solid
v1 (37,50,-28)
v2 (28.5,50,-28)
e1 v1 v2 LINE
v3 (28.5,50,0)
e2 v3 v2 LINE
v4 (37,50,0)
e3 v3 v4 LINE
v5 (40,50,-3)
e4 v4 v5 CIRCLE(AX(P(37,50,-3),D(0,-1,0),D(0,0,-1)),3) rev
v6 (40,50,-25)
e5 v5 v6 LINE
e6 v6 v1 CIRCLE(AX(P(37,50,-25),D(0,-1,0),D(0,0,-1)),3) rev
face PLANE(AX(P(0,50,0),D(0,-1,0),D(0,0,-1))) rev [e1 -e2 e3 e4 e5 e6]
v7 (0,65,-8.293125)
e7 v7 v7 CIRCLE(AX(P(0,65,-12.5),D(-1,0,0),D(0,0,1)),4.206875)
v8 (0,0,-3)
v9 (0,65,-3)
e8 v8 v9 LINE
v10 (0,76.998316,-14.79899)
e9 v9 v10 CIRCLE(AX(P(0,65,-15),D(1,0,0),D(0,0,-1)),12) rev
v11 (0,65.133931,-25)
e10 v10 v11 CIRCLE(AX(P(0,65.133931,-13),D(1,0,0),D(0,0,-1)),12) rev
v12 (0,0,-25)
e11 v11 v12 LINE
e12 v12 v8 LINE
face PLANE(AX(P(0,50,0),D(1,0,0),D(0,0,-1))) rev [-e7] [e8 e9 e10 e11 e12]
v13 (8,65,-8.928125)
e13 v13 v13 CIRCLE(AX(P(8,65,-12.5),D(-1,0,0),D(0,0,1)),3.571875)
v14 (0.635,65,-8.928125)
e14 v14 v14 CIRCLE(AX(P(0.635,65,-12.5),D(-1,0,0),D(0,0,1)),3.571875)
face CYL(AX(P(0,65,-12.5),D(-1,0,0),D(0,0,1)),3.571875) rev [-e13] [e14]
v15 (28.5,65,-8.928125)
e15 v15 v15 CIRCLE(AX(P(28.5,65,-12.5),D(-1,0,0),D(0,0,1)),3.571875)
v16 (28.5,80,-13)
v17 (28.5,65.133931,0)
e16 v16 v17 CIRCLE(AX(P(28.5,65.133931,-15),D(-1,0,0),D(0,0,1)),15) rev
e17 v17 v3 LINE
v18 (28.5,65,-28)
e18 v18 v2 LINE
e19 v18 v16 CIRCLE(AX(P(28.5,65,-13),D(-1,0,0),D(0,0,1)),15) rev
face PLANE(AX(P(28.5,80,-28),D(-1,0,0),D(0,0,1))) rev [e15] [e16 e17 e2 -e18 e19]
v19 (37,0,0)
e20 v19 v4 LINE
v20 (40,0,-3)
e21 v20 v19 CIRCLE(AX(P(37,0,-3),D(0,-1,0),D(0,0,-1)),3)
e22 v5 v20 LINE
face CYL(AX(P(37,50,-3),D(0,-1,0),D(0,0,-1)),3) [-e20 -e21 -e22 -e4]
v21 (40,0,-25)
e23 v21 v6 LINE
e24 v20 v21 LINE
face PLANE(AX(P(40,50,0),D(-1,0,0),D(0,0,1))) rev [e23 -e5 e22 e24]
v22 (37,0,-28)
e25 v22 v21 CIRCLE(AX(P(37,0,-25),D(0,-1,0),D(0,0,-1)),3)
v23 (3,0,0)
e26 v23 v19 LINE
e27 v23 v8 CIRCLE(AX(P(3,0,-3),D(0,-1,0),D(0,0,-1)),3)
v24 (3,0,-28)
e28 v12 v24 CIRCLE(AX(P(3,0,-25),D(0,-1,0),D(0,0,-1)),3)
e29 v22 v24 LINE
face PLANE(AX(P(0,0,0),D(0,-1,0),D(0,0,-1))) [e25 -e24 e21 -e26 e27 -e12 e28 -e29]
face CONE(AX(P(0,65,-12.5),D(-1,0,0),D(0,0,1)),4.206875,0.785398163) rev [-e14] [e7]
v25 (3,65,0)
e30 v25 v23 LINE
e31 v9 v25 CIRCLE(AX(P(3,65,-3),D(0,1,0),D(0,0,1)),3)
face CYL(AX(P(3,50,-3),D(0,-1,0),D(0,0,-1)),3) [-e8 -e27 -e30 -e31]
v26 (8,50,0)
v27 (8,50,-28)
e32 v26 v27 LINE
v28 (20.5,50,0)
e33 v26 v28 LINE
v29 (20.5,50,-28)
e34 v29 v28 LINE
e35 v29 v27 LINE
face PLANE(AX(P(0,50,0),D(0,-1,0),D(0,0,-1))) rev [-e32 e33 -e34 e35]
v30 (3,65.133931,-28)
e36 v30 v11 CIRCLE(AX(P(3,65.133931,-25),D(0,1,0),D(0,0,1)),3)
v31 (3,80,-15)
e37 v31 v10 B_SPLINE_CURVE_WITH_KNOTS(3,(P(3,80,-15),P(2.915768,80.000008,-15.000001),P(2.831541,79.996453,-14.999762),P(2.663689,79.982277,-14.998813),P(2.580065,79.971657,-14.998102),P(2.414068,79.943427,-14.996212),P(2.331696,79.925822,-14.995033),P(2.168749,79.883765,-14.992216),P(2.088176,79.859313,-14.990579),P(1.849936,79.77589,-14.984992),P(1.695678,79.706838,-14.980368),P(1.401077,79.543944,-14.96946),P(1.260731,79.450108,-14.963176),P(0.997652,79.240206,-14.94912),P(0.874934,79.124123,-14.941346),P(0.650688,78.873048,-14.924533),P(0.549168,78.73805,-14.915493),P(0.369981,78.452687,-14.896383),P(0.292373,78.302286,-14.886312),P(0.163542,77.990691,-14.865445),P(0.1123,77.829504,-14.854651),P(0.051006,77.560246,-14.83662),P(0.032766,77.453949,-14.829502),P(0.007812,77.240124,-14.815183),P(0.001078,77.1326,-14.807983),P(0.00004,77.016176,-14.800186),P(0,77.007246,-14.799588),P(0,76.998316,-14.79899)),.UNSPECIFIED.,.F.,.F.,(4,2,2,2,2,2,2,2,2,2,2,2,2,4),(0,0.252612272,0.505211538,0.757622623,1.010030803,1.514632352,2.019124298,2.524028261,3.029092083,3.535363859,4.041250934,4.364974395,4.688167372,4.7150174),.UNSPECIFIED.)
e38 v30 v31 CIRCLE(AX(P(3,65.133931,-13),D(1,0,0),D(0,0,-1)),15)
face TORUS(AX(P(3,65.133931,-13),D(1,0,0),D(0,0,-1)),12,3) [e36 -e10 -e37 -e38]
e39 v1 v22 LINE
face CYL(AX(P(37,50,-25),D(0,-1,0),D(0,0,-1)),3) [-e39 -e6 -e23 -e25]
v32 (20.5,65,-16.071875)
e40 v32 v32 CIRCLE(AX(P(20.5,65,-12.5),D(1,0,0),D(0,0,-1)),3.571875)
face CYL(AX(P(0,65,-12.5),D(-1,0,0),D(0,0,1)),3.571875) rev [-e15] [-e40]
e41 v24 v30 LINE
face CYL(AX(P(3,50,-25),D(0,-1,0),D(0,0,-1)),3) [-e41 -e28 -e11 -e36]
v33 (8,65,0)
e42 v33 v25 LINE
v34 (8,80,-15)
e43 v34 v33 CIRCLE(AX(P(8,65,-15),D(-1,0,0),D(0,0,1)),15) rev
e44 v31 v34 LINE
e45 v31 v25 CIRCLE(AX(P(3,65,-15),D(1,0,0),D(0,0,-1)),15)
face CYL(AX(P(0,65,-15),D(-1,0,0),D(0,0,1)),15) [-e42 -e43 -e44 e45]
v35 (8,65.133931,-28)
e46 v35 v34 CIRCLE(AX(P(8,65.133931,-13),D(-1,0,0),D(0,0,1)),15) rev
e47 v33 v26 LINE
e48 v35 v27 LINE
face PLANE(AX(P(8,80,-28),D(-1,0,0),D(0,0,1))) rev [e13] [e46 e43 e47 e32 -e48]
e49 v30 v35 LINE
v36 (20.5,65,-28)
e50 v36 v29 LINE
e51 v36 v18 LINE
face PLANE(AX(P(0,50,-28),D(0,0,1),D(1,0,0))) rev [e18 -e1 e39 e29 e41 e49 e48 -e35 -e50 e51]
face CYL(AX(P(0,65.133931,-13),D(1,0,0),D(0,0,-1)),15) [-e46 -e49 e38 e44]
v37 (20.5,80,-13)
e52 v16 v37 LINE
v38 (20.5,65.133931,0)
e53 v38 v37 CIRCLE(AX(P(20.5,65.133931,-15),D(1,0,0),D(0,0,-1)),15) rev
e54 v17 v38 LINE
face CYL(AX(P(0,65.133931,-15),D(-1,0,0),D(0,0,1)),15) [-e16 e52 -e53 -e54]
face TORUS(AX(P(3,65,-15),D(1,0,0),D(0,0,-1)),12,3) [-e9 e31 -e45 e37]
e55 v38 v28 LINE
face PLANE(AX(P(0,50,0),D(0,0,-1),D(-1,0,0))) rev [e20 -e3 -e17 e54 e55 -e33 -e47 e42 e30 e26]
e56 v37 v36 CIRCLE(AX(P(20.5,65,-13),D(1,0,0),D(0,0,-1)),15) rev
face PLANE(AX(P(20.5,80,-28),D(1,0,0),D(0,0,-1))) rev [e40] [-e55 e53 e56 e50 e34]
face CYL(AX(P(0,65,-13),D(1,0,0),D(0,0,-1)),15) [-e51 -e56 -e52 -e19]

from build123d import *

# Parameters (mm, degrees)
SKETCH2_W                                 = 40
SKETCH2_H                                 = 28
BOSS_EXTRUDE2_DEPTH                       = 50
SKETCH3_W                                 = 8
SKETCH3_H                                 = 28
BOSS_EXTRUDE3_DEPTH                       = 30
F_9_32_0_28125_DIAMETER_HOLE1_D           = 7.14375
F_9_32_0_28125_DIAMETER_HOLE1_CSINK_D     = 8.41375
F_9_32_0_28125_DIAMETER_HOLE1_CSINK_ANGLE = 90
FILLET5_R                                 = 15
FILLET3_R                                 = 15
FILLET4_R                                 = 15
FILLET6_R                                 = 15
FILLET7_R                                 = 3
FILLET8_R                                 = 3


with BuildPart() as part:
    # Sketch2 → Boss-Extrude2 (new body)
    with BuildSketch(Plane(origin=(0, 0, 0), x_dir=(1, 0, 0), z_dir=(0, 1, 0))):
        with Locations((20, 14)):
            Rectangle(SKETCH2_W, SKETCH2_H)
    extrude(amount=BOSS_EXTRUDE2_DEPTH)

    # Sketch3 → Boss-Extrude3 (add)
    with BuildSketch(Plane(origin=(0, 50, 0), x_dir=(1, 0, 0), z_dir=(0, 1, 0))):
        with Locations((4, 14)):
            Rectangle(SKETCH3_W, SKETCH3_H)
        with Locations((24.5, 14)):
            Rectangle(SKETCH3_W, SKETCH3_H)
    extrude(amount=BOSS_EXTRUDE3_DEPTH)

    # 9/32 (0.28125) Diameter Hole1 (through all)
    with Locations(Plane(origin=(0, 65, -12.5), x_dir=(0, 0, -1), z_dir=(-1, 0, 0))):
        with Locations((0, 0)):
            CounterSinkHole(F_9_32_0_28125_DIAMETER_HOLE1_D / 2, F_9_32_0_28125_DIAMETER_HOLE1_CSINK_D / 2, counter_sink_angle=F_9_32_0_28125_DIAMETER_HOLE1_CSINK_ANGLE)

    # Fillet5
    fillet5_edges = [part.edges().sort_by_distance(p)[0] for p in [
        (4, 80, 0),
    ]]
    fillet(fillet5_edges, radius=FILLET5_R)

    # Fillet3
    fillet3_edges = [part.edges().sort_by_distance(p)[0] for p in [
        (24.5, 80, -28),
    ]]
    fillet(fillet3_edges, radius=FILLET3_R)

    # Fillet4
    # the kernel refuses this fillet: 15 mm, written as the material it takes off along each edge
    with BuildSketch(Plane(origin=(65.665171868, 80, 0), x_dir=(0, 0, -1), z_dir=(-1, 0, 0))) as fillet4_piece_1:
        with BuildLine():
            CenterArc((15, 14.866068747), FILLET4_R, 180, 82.337744339)
            Line((0, 14.866068747), (-0.3, 14.866068747))
            Line((-0.3, 14.866068747), (-0.3, 0))
            Line((-0.3, 0), (0, -0.3))
            ThreePointArc((0, -0.3), (6.5, -0.3), (12.96, -0.297321375))
            Line((12.96, -0.297321375), (13, 0))
        make_face()
    extrude(amount=82.330343737, mode=Mode.SUBTRACT)

    # Fillet6
    # the kernel refuses this fillet: 15 mm, written as the material it takes off along each edge
    with BuildSketch(Plane(origin=(-37.165171868, 80, -28), x_dir=(0, -1, 0), z_dir=(1, 0, 0))) as fillet6_piece_1:
        with BuildLine():
            CenterArc((14.866068747, -15), FILLET6_R, 90, 82.337744339)
            Line((0, -13), (-0.297321375, -12.96))
            ThreePointArc((-0.297321375, -12.96), (-0.3, -6.5), (-0.3, 0))
            Line((-0.3, 0), (0, 0.3))
            Line((0, 0.3), (14.866068747, 0.3))
            Line((14.866068747, 0.3), (14.866068747, 0))
        make_face()
    extrude(amount=82.330343737, mode=Mode.SUBTRACT)

    # Fillet7
    # the kernel refuses this fillet: 3 mm, written as the material it takes off along each edge
    with BuildSketch(Plane(origin=(0, 65, 0), x_dir=(1, 0, 0), z_dir=(0, -1, 0))) as fillet7_piece_1:
        with BuildLine():
            CenterArc((FILLET7_R, -FILLET7_R), FILLET7_R, 90, 90)
            Line((0, -FILLET7_R), (0, 0))
            Line((0, 0), (FILLET7_R, 0))
        make_face()
    extrude(amount=72.5, mode=Mode.SUBTRACT)
    with BuildSketch(Plane(origin=(0, 65, -15), x_dir=(0, 0, 1), z_dir=(0, -1, 0))) as fillet7_piece_2:
        with BuildLine():
            CenterArc((15 - FILLET7_R, -FILLET7_R), FILLET7_R, 0, 90)
            Line((15, -FILLET7_R), (15, 0))
            Line((15, 0), (15 - FILLET7_R, 0))
        make_face()
    revolve(axis=Axis((0, 65, -15), (-1, 0, 0)), revolution_arc=118.659397847, mode=Mode.SUBTRACT)
    with BuildSketch(Plane(origin=(0, 65.133931253, -28), x_dir=(1, 0, 0), z_dir=(0, -1, 0))) as fillet7_piece_3:
        with BuildLine():
            CenterArc((FILLET7_R, FILLET7_R), FILLET7_R, 180, 90)
            Line((0, FILLET7_R), (0, 0))
            Line((0, 0), (FILLET7_R, 0))
        make_face()
    extrude(amount=72.633931253, mode=Mode.SUBTRACT)
    with BuildSketch(Plane(origin=(0, 65.133931253, -13), x_dir=(0, 0.933610035263845, 0.3582908065449657), z_dir=(0, -0.3582908065449657, 0.933610035263845))) as fillet7_piece_4:
        with BuildLine():
            CenterArc((15 - FILLET7_R, -FILLET7_R), FILLET7_R, 360, 90)
            Line((15, -FILLET7_R), (15, 0))
            Line((15, 0), (15 - FILLET7_R, 0))
        make_face()
    revolve(axis=Axis((0, 65.133931253, -13), (-1, 0, 0)), revolution_arc=110.995265648, mode=Mode.SUBTRACT)

    # Fillet8
    fillet8_edges = [part.edges().sort_by_distance(p)[0] for p in [
        (40, 25, -28),
        (40, 25, 0),
    ]]
    fillet(fillet8_edges, radius=FILLET8_R)


solid = part.part
